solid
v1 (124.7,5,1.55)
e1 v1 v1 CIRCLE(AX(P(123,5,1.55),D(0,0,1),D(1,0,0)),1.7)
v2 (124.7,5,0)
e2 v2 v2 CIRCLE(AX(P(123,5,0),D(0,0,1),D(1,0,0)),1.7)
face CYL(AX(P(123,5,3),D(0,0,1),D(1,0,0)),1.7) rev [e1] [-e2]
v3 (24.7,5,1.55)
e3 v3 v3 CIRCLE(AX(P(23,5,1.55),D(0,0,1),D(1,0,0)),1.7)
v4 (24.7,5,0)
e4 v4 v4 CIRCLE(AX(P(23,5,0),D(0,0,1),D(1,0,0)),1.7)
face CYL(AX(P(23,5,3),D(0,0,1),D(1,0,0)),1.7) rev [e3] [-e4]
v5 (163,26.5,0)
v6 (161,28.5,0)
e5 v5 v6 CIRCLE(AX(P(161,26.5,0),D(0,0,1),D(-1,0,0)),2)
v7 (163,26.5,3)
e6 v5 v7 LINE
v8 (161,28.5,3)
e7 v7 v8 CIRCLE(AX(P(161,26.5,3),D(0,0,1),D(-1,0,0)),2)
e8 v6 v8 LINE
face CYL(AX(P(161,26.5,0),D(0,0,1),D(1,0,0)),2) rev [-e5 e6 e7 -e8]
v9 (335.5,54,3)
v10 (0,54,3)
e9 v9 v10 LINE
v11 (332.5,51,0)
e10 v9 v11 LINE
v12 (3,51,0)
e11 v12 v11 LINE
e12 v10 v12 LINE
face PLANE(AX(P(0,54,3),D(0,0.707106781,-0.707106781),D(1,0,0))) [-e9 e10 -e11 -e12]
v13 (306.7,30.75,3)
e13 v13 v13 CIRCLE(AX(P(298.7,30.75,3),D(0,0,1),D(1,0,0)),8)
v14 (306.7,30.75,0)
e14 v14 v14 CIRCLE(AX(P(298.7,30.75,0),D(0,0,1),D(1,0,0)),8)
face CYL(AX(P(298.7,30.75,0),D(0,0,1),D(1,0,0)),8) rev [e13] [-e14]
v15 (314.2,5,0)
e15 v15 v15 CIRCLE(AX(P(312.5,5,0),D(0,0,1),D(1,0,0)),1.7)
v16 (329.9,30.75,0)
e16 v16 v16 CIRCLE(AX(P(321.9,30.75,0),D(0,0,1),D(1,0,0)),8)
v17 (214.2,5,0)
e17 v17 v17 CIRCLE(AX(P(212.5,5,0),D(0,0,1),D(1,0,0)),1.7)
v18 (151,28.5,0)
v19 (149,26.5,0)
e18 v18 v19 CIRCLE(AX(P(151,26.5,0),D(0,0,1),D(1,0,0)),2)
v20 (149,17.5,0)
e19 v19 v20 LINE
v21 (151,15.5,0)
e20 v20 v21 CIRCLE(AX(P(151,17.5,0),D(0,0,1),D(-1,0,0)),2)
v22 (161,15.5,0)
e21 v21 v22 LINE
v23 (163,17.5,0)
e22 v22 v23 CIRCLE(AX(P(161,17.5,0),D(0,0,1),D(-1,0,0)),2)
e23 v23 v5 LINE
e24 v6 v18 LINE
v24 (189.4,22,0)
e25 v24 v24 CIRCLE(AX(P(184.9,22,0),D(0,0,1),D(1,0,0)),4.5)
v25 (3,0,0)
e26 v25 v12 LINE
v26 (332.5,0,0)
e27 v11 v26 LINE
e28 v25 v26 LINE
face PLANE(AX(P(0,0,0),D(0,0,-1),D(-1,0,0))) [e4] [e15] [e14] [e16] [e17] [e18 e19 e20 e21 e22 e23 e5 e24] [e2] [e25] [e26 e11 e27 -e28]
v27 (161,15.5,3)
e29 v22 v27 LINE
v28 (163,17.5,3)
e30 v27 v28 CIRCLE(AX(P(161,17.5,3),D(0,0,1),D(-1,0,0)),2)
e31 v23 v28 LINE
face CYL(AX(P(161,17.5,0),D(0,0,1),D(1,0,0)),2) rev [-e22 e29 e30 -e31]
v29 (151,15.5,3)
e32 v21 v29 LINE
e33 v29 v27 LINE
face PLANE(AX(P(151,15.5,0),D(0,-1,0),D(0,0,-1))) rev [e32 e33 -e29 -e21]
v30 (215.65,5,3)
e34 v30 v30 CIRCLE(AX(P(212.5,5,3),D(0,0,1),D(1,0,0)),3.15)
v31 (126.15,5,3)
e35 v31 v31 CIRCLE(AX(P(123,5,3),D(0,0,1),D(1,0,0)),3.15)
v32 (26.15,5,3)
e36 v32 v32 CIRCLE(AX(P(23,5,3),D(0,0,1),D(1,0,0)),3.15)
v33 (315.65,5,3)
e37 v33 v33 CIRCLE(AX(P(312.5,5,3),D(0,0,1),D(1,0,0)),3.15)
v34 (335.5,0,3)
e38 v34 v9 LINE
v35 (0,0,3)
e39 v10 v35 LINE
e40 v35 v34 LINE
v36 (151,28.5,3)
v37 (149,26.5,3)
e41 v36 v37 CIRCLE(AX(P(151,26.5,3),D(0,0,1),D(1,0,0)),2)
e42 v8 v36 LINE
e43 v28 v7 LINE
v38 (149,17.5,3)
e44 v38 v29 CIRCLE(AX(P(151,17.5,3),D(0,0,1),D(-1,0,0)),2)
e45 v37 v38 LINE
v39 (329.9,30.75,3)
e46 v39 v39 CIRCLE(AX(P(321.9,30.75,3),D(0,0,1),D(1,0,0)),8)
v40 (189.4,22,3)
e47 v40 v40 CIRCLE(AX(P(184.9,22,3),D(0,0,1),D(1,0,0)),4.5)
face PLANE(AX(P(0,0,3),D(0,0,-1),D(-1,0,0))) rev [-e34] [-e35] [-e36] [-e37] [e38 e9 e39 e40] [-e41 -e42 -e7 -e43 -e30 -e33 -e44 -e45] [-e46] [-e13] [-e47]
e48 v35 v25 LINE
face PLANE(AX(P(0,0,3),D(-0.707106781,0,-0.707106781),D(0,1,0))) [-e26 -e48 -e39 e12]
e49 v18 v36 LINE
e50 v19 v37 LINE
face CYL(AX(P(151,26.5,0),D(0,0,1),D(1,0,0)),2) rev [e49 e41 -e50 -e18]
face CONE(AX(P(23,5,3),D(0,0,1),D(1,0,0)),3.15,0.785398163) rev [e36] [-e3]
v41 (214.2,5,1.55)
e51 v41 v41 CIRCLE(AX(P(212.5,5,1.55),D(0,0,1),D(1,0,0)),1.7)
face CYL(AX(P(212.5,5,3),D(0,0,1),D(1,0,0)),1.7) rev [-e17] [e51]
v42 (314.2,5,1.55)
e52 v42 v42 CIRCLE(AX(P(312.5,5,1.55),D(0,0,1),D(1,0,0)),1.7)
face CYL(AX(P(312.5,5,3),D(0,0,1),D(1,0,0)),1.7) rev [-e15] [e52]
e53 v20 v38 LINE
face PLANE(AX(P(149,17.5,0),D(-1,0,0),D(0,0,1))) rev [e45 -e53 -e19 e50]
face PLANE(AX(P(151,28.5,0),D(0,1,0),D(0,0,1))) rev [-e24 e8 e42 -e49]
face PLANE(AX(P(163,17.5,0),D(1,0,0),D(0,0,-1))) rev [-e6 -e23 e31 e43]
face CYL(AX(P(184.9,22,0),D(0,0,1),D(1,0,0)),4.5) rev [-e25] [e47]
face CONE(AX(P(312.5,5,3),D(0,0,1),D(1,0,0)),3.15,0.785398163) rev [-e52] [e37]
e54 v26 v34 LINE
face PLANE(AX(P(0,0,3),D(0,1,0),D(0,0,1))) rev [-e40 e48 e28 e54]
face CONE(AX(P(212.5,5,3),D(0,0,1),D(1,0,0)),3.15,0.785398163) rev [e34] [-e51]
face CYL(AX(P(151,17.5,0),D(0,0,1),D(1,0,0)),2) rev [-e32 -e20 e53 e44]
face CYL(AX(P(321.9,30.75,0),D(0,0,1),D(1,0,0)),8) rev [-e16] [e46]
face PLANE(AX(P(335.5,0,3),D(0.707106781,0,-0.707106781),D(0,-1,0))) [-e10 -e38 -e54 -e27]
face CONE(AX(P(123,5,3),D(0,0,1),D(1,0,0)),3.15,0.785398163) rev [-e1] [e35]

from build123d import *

# Parameters (mm, degrees)
SKETCH1_W                                      = 335.5
SKETCH1_H                                      = 54
BOSS_EXTRUDE1_DEPTH                            = 3
CHAMFER1_SIZE                                  = 3
CSK_FOR_M3_FLAT_HEAD_MACHINE_SCREW1_AT_2_COUNT = 2
CSK_FOR_M3_FLAT_HEAD_MACHINE_SCREW1_AT_2_PITCH = 100
CSK_FOR_M3_FLAT_HEAD_MACHINE_SCREW1_AT_3_COUNT = 2
CSK_FOR_M3_FLAT_HEAD_MACHINE_SCREW1_AT_3_PITCH = 189.5
CSK_FOR_M3_FLAT_HEAD_MACHINE_SCREW1_AT_4_COUNT = 2
CSK_FOR_M3_FLAT_HEAD_MACHINE_SCREW1_AT_4_PITCH = 289.5
SKETCH5_R                                      = 4.5
SKETCH5_R_2                                    = 8
CUT_EXTRUDE1_DEPTH                             = 340.831208102


with BuildPart() as part:
    # Sketch1 → Boss-Extrude1 (new body)
    with BuildSketch(Plane.XY):
        with Locations((167.75, 27)):
            Rectangle(SKETCH1_W, SKETCH1_H)
    extrude(amount=BOSS_EXTRUDE1_DEPTH)

    # Chamfer1
    chamfer1_edges = [part.edges().sort_by_distance(p)[0] for p in [
        (0, 27, 0),
        (167.75, 54, 0),
        (335.5, 27, 0),
    ]]
    chamfer(chamfer1_edges, length=CHAMFER1_SIZE - 0.0001)  # a hair under: the kernel refuses the full size

    # Sketch3 → CSK for M3 Flat Head Machine Screw1 (revolve, cut)
    with BuildSketch(Plane(origin=(23, 5, 3), x_dir=(0, -1, 0), z_dir=(1, 0, 0))):
        Polygon((0, 0), (0, 3), (1.7, 3), (1.7, 1.45), (3.15, 0), align=None)
    csk_for_m3_flat_head_machine_screw1 = revolve(axis=Axis((23, 5, 9.35), (0, 0, -1)), mode=Mode.SUBTRACT)

    # CSK for M3 Flat Head Machine Screw1 at 2: CSK for M3 Flat Head Machine Screw1 ×2
    with Locations(*[(i * CSK_FOR_M3_FLAT_HEAD_MACHINE_SCREW1_AT_2_PITCH, 0, 0) for i in range(1, CSK_FOR_M3_FLAT_HEAD_MACHINE_SCREW1_AT_2_COUNT)]):
        add(csk_for_m3_flat_head_machine_screw1, mode=Mode.SUBTRACT)

    # CSK for M3 Flat Head Machine Screw1 at 3: CSK for M3 Flat Head Machine Screw1 ×2
    with Locations(*[(i * CSK_FOR_M3_FLAT_HEAD_MACHINE_SCREW1_AT_3_PITCH, 0, 0) for i in range(1, CSK_FOR_M3_FLAT_HEAD_MACHINE_SCREW1_AT_3_COUNT)]):
        add(csk_for_m3_flat_head_machine_screw1, mode=Mode.SUBTRACT)

    # CSK for M3 Flat Head Machine Screw1 at 4: CSK for M3 Flat Head Machine Screw1 ×2
    with Locations(*[(i * CSK_FOR_M3_FLAT_HEAD_MACHINE_SCREW1_AT_4_PITCH, 0, 0) for i in range(1, CSK_FOR_M3_FLAT_HEAD_MACHINE_SCREW1_AT_4_COUNT)]):
        add(csk_for_m3_flat_head_machine_screw1, mode=Mode.SUBTRACT)

    # Sketch5 → Cut-Extrude1 (cut, through all)
    with BuildSketch(Plane.XY.offset(3)):
        with Locations((184.9, 22)):
            Circle(SKETCH5_R)
        with Locations((298.7, 30.75)):
            Circle(SKETCH5_R_2)
        with Locations((321.9, 30.75)):
            Circle(SKETCH5_R_2)
        with BuildLine():
            Line((151, 28.5), (161, 28.5))
            ThreePointArc((161, 28.5), (162.414213562, 27.914213562), (163, 26.5))
            Line((163, 26.5), (163, 17.5))
            ThreePointArc((163, 17.5), (162.414213562, 16.085786438), (161, 15.5))
            Line((161, 15.5), (151, 15.5))
            ThreePointArc((151, 15.5), (149.585786438, 16.085786438), (149, 17.5))
            Line((149, 17.5), (149, 26.5))
            ThreePointArc((149, 26.5), (149.585786438, 27.914213562), (151, 28.5))
        make_face()
    extrude(amount=-CUT_EXTRUDE1_DEPTH, mode=Mode.SUBTRACT)


solid = part.part
